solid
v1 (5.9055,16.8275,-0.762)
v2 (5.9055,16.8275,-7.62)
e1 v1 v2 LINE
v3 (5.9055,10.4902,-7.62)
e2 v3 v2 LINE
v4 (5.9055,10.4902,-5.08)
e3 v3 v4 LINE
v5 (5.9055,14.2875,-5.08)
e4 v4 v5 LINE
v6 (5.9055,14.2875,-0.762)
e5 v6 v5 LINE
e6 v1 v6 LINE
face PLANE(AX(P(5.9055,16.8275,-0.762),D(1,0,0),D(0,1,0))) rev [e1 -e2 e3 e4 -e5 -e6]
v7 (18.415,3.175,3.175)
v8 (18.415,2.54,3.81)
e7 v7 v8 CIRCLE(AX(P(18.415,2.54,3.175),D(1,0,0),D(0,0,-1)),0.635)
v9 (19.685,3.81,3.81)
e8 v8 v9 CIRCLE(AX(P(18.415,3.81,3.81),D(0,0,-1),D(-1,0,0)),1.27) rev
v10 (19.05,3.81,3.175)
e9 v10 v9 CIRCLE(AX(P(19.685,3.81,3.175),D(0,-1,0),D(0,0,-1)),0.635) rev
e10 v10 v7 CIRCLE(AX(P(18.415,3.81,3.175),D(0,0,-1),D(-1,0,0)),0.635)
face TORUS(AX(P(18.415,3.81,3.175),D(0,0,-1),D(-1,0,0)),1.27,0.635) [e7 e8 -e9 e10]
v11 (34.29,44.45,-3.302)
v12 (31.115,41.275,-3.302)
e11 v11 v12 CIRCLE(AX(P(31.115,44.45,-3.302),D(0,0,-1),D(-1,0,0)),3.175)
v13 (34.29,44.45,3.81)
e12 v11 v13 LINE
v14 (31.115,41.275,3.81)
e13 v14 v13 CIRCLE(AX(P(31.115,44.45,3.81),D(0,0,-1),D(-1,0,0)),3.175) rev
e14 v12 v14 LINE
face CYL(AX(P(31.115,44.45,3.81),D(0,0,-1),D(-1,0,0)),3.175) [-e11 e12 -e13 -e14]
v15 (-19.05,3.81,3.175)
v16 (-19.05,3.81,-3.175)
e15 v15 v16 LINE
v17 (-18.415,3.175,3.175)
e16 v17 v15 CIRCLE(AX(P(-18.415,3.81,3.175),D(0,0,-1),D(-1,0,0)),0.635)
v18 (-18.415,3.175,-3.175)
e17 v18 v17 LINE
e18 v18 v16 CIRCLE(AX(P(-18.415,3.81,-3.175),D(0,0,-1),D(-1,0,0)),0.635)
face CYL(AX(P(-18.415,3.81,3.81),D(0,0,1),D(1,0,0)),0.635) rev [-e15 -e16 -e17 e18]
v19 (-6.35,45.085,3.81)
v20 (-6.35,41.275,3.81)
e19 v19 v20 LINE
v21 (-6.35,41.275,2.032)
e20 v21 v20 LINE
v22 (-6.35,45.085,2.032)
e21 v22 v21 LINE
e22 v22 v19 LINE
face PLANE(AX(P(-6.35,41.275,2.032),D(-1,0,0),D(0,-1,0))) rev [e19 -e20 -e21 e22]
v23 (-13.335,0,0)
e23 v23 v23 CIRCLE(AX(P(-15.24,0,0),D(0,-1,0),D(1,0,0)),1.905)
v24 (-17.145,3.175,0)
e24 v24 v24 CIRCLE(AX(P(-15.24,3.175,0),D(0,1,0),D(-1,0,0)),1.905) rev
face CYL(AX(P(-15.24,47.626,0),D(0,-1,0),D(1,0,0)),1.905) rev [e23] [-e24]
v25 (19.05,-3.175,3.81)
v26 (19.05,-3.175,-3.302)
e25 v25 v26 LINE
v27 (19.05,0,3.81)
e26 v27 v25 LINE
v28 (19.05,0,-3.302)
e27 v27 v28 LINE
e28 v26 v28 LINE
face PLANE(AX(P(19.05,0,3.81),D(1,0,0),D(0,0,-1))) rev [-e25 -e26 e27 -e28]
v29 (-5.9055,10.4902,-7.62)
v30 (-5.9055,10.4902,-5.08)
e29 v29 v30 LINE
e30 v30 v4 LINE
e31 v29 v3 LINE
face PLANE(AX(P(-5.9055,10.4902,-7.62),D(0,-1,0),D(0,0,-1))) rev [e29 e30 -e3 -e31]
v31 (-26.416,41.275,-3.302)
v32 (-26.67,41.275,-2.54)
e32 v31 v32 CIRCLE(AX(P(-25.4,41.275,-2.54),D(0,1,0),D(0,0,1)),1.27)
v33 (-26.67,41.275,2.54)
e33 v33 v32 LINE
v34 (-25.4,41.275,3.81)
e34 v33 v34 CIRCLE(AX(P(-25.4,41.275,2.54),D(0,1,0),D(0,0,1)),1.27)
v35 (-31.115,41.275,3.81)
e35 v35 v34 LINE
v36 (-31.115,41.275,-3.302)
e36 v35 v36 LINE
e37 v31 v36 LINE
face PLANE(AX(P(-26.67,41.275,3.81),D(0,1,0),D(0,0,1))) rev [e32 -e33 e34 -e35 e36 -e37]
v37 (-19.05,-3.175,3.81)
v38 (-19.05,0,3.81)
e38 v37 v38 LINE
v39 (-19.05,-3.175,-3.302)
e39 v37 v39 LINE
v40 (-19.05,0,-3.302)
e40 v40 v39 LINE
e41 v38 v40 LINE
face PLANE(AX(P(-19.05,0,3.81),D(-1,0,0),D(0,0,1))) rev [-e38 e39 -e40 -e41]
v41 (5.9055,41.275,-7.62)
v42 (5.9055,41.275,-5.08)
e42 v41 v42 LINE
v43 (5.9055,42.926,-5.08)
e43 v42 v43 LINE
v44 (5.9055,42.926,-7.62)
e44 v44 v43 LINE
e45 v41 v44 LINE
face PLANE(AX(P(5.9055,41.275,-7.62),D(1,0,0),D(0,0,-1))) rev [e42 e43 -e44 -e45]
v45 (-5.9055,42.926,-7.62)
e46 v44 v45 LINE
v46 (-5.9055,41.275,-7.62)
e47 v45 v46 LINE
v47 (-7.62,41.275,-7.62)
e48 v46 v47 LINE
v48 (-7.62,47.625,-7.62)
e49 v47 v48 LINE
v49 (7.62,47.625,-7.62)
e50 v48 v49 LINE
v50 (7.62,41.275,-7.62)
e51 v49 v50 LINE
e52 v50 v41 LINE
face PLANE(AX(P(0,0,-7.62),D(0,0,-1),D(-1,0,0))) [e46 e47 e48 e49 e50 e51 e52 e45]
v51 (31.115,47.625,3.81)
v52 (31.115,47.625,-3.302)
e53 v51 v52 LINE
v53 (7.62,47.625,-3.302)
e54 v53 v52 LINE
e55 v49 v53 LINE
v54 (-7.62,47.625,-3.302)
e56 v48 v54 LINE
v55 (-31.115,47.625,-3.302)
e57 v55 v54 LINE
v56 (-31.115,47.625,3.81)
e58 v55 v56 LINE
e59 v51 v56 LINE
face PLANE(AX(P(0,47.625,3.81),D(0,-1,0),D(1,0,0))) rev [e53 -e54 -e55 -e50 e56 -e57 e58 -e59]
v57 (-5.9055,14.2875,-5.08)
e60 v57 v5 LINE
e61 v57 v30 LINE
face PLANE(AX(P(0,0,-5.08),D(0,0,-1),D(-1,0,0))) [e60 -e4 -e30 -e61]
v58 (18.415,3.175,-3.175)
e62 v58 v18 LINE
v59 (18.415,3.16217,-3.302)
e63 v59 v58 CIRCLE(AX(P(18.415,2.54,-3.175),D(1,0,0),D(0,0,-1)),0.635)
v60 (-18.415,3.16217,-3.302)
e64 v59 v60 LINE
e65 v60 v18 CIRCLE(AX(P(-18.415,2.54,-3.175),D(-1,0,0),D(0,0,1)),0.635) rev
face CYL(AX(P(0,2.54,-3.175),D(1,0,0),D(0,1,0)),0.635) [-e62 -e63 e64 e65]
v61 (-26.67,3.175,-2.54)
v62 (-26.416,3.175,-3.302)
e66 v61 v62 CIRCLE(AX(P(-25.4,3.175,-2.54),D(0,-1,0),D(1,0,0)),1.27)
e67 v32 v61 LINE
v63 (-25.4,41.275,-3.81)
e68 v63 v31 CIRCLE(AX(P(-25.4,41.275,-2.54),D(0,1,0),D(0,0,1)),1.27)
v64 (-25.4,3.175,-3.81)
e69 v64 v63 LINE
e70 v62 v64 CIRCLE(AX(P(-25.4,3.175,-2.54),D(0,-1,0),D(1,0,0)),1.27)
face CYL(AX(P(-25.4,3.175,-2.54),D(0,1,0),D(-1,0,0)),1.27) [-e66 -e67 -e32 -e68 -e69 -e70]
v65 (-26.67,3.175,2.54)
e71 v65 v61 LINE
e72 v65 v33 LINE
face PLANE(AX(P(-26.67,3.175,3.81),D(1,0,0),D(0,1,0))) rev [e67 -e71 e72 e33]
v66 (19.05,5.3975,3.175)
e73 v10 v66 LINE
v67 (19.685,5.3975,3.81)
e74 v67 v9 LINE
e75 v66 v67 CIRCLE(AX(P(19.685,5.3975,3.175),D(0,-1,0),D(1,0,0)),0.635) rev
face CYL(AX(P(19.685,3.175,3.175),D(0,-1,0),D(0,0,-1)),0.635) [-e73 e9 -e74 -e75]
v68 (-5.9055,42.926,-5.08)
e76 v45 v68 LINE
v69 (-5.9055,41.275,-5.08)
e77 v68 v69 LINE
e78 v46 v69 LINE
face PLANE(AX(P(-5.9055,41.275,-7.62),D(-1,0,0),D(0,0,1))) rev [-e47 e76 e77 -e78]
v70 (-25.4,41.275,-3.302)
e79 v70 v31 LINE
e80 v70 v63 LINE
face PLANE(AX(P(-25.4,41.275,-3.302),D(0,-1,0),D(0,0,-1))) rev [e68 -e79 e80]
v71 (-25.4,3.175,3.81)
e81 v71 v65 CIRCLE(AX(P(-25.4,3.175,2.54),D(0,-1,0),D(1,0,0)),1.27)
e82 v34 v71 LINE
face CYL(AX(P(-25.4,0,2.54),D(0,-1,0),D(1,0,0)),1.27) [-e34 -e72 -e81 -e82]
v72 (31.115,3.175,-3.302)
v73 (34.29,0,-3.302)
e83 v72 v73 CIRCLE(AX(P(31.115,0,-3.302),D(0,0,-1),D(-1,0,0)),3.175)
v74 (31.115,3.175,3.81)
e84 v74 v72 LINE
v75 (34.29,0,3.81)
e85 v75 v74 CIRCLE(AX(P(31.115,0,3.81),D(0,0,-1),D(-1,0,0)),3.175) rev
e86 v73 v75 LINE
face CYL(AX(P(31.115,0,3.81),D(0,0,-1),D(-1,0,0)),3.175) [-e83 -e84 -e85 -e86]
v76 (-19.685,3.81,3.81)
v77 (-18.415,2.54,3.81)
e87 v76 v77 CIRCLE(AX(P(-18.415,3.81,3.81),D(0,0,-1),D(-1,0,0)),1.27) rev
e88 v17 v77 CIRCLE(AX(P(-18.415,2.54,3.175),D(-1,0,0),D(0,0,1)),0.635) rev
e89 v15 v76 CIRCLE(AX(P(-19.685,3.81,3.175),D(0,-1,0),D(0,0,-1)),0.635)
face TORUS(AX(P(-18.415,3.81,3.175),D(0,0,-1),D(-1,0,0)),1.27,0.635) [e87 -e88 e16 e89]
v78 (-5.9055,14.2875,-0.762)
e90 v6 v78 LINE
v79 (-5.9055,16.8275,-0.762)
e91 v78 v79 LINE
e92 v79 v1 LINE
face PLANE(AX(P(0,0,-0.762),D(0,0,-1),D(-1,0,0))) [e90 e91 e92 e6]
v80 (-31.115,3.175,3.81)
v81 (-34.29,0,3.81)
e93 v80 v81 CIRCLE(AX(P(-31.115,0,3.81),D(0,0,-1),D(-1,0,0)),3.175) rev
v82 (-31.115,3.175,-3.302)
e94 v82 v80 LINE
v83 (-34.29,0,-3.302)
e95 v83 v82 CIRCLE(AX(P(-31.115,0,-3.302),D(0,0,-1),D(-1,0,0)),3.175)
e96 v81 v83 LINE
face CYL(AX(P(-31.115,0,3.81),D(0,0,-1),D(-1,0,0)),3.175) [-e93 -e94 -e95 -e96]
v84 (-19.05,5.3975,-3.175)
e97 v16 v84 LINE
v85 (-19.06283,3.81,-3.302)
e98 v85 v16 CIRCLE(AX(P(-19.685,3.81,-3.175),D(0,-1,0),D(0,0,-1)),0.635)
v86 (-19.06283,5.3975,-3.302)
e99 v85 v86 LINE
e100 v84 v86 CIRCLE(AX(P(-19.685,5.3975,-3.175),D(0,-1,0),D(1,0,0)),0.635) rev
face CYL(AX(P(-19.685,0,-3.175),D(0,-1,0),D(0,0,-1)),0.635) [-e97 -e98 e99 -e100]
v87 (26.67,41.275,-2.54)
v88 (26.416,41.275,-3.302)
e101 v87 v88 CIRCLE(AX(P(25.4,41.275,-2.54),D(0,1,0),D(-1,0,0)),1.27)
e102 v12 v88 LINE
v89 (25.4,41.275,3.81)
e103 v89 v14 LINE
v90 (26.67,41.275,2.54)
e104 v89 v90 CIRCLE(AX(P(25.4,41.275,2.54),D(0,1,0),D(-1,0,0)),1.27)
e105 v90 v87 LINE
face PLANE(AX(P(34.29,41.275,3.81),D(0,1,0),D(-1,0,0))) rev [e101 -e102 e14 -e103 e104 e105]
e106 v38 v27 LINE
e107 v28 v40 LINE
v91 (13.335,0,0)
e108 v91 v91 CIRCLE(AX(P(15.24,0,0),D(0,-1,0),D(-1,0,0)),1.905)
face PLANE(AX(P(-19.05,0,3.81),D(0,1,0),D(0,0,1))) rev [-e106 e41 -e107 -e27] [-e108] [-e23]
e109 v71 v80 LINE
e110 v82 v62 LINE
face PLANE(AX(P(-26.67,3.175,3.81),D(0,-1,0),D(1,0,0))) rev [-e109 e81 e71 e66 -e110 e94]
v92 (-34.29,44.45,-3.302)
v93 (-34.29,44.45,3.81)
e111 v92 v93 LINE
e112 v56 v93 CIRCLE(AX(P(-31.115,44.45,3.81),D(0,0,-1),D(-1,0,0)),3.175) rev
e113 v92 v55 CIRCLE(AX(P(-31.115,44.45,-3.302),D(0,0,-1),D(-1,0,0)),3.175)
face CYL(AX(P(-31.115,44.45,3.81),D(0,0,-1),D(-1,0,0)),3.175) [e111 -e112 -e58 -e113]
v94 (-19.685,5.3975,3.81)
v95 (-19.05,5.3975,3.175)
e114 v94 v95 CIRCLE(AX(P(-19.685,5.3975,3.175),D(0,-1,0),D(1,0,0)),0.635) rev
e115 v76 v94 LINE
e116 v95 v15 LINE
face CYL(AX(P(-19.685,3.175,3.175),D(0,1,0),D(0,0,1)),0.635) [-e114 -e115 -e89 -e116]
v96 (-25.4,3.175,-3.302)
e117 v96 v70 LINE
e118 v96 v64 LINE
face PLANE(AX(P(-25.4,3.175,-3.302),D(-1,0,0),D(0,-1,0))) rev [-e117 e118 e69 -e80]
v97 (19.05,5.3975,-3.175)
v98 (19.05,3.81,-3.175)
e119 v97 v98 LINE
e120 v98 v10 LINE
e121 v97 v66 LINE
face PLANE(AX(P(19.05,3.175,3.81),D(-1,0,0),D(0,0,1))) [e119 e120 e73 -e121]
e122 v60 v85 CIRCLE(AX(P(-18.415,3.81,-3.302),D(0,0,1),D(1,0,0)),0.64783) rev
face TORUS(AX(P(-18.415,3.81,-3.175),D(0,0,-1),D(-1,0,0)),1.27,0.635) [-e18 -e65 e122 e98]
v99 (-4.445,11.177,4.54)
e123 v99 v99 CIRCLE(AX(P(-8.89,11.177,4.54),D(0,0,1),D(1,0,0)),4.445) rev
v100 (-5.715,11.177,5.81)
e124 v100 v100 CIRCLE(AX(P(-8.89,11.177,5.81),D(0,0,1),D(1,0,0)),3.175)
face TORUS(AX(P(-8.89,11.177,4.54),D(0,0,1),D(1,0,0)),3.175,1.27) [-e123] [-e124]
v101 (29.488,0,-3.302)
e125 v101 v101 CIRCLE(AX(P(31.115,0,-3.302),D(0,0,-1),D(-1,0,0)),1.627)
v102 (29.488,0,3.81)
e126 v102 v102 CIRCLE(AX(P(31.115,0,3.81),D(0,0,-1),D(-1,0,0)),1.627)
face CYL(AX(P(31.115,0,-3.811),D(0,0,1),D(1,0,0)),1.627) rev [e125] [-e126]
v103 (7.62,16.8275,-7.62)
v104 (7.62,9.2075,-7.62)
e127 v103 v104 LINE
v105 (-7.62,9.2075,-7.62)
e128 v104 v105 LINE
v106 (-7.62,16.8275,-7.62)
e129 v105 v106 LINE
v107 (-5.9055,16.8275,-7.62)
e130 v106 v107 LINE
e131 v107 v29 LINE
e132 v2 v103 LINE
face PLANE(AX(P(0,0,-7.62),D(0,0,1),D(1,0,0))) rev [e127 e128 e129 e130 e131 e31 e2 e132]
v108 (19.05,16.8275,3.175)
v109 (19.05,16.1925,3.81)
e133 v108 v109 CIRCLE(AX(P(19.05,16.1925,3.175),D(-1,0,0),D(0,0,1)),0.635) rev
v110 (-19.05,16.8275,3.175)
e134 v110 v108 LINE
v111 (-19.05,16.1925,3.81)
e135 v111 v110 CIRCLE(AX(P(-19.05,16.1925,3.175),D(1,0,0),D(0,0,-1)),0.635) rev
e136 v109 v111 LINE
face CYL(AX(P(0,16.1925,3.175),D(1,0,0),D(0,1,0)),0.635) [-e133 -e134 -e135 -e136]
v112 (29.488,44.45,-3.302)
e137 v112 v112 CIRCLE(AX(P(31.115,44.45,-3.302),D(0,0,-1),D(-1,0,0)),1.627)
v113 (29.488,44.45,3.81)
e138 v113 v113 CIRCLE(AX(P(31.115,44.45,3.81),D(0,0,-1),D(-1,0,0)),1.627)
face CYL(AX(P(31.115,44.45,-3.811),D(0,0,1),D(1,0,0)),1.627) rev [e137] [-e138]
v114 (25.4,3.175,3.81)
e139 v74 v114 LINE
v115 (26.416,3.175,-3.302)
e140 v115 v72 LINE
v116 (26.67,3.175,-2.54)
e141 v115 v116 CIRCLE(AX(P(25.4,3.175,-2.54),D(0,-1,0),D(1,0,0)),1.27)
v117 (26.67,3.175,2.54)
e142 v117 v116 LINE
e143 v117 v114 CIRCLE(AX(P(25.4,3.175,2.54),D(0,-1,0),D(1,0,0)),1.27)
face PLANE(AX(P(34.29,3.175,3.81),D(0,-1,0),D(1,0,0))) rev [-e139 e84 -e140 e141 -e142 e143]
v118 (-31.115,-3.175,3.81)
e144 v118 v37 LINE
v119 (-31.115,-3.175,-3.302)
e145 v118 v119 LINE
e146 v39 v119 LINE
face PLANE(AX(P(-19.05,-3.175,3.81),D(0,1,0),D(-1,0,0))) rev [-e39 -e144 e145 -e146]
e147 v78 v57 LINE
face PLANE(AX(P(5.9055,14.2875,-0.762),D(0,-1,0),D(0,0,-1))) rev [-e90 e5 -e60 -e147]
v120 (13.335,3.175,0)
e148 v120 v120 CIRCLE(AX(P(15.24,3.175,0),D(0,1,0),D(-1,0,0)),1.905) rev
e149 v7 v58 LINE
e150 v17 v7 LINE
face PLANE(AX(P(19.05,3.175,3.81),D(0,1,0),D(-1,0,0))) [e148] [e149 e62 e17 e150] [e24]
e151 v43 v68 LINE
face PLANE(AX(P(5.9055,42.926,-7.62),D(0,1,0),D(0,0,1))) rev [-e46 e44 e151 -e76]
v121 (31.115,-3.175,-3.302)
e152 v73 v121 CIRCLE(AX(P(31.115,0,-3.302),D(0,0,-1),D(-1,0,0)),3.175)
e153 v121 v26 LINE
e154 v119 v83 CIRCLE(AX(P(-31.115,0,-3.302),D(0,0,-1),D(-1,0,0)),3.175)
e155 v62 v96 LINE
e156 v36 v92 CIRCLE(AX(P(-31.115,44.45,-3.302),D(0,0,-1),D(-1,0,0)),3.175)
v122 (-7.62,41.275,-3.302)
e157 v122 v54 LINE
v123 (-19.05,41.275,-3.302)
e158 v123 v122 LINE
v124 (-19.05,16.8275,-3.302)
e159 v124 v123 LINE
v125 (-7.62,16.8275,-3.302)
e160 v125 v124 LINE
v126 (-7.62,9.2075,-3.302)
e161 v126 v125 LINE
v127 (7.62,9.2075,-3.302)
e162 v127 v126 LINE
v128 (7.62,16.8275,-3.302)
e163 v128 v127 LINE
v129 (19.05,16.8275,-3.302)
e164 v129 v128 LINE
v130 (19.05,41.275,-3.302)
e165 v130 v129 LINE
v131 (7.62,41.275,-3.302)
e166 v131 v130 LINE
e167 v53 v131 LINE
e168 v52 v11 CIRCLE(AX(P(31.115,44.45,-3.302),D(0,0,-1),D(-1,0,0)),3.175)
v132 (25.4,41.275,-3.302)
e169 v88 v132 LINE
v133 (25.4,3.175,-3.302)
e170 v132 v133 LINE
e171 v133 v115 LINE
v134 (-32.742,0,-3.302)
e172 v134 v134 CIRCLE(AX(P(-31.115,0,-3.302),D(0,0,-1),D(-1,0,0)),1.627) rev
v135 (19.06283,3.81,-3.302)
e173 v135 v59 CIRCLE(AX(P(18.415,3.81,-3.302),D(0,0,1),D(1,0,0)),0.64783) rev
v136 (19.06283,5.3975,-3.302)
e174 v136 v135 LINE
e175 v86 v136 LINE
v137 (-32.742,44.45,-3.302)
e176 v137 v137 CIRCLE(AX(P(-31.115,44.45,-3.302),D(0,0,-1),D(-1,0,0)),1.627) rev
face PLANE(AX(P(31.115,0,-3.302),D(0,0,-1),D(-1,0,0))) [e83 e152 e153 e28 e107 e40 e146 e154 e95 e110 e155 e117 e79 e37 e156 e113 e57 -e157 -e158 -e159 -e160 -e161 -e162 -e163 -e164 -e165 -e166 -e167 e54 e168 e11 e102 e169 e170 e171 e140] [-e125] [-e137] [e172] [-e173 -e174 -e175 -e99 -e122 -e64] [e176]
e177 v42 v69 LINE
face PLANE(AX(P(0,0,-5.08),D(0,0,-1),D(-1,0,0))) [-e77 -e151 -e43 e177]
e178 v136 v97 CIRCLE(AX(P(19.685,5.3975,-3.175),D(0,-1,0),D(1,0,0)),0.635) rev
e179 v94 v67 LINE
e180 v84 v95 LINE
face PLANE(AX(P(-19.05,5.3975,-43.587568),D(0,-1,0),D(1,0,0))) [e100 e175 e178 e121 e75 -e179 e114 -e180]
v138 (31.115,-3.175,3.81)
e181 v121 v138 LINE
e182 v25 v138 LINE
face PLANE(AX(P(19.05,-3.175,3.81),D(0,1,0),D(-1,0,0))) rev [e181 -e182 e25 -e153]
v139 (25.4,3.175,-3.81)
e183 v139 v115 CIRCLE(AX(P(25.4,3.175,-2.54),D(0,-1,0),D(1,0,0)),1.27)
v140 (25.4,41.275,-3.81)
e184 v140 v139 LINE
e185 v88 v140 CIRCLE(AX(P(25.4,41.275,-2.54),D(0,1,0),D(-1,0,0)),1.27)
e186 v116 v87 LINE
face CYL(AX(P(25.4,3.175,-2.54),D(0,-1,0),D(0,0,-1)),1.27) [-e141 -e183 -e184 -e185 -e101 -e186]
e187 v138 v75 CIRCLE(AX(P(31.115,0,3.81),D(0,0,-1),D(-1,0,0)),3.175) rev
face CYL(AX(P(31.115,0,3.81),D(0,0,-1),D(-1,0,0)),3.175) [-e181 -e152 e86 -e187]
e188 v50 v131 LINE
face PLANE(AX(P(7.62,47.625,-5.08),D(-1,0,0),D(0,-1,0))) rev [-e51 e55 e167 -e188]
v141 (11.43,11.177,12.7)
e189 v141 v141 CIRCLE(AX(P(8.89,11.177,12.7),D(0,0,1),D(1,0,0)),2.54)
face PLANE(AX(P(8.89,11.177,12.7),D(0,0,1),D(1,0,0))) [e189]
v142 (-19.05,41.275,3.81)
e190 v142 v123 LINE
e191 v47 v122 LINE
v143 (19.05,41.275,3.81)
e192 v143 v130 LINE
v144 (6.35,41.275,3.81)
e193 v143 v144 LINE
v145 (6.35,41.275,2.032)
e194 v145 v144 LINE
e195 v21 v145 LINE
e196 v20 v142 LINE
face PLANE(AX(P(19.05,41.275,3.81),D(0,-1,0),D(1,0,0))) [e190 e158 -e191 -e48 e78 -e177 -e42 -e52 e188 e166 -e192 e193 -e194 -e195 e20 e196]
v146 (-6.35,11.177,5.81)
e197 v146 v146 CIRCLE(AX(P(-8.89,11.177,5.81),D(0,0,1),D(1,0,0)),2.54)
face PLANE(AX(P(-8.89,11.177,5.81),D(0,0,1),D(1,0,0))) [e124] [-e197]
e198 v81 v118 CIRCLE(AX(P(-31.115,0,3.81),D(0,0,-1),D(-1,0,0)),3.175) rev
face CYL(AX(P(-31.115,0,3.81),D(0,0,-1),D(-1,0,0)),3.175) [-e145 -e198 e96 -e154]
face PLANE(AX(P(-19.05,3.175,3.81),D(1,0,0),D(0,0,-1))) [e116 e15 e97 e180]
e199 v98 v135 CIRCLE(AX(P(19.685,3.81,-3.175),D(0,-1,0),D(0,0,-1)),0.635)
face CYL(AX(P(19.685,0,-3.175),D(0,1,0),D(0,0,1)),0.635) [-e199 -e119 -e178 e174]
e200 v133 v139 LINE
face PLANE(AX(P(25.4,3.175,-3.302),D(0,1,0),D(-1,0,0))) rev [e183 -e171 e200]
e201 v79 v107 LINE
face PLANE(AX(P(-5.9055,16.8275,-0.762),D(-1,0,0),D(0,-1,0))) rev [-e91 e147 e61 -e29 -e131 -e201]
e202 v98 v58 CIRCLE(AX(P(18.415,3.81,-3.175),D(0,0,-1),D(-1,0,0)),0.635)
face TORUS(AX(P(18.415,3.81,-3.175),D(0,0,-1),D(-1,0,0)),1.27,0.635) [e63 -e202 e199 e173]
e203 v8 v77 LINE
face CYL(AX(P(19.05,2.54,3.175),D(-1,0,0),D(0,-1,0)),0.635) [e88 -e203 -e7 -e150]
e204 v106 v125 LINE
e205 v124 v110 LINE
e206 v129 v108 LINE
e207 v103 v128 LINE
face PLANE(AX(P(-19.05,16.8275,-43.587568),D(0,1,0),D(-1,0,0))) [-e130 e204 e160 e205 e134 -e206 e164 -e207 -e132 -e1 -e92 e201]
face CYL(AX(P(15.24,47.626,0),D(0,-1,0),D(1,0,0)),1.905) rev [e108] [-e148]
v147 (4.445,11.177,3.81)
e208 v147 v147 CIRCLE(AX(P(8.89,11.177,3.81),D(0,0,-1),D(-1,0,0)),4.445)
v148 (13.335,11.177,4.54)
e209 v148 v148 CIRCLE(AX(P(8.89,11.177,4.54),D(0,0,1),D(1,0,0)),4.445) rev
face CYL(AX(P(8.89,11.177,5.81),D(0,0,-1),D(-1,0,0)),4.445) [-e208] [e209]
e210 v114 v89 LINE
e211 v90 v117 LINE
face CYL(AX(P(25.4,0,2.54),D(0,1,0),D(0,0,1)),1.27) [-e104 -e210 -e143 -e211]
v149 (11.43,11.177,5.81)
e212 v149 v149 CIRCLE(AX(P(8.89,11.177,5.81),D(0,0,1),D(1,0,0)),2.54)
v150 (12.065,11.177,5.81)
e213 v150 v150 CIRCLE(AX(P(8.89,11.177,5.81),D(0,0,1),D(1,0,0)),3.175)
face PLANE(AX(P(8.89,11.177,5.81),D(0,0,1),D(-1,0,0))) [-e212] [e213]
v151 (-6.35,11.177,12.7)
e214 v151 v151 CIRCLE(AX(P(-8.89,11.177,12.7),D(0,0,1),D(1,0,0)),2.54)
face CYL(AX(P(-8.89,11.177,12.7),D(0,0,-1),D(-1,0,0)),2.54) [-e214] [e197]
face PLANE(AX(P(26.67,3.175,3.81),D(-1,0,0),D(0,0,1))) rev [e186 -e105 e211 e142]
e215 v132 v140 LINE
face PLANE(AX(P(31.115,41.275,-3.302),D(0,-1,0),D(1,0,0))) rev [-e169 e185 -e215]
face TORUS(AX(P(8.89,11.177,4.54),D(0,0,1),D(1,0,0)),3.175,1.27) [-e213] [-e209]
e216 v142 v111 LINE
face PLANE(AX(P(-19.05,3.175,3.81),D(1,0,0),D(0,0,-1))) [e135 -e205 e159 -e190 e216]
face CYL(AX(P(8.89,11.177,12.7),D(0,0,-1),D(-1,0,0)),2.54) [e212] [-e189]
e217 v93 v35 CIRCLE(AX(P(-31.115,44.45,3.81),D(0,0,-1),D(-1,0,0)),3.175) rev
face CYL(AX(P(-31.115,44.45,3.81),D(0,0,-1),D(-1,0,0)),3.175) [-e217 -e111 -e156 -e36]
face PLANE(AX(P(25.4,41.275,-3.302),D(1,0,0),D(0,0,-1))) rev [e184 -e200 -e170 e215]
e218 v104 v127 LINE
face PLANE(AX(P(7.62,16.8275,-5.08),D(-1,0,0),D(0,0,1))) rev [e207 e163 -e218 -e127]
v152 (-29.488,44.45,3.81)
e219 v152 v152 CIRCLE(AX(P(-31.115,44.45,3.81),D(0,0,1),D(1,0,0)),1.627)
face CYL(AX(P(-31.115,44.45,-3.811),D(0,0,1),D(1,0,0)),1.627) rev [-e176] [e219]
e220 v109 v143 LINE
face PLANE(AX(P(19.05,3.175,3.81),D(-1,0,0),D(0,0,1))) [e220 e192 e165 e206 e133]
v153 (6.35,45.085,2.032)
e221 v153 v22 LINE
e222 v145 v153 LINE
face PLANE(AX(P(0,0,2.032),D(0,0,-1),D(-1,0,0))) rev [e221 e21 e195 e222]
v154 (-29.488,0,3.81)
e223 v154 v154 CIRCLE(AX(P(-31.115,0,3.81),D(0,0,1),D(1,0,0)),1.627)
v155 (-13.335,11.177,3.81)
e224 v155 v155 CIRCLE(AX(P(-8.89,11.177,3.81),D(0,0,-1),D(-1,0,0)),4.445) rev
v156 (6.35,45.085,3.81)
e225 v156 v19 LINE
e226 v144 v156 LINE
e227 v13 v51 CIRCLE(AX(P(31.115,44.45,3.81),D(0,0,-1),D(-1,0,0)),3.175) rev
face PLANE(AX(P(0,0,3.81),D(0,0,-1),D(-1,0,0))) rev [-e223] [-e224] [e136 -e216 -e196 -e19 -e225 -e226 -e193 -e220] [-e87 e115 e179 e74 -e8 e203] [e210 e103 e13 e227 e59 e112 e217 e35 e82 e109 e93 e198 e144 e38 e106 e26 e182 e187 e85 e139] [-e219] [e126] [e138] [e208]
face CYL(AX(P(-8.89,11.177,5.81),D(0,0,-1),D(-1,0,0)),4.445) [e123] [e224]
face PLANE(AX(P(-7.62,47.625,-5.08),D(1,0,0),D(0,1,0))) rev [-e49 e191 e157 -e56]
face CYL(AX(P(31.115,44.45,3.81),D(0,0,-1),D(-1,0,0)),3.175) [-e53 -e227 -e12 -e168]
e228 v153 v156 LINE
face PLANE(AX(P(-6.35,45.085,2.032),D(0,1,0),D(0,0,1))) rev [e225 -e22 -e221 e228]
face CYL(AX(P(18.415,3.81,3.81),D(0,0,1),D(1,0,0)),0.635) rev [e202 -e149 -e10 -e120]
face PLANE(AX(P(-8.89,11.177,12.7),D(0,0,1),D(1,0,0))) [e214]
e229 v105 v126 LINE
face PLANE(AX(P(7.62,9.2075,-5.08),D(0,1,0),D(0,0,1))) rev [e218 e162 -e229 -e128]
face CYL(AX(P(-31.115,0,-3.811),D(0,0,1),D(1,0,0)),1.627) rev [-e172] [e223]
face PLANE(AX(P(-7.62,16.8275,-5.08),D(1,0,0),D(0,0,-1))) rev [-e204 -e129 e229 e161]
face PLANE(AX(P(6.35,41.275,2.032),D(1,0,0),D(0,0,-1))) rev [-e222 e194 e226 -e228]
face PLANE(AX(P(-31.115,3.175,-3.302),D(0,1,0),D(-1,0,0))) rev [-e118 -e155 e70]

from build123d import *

# Parameters (mm, degrees)
BOSS_EXTRUDE2_DEPTH  = 3.81
FILLET1_R            = 3.175
CUT_EXTRUDE1_REACH   = 61.178
SKETCH4_R            = 1.627
FILLET2_R            = 1.27
CUT_EXTRUDE2_REACH   = 60.809
SKETCH5_R            = 1.905
SKETCH6_W            = 38.1
SKETCH6_H            = 11.43
BOSS_EXTRUDE3_DEPTH  = 7.62
SKETCH7_R            = 2.54
BOSS_EXTRUDE4_DEPTH  = 8.89
SKETCH8_R            = 4.445
BOSS_EXTRUDE5_DEPTH  = 2
FILLET3_R            = 1.27
FILLET3_OF_MIRROR3_R = 1.27
FILLET4_R            = 0.635
CUT_EXTRUDE3_START   = -0.508
CUT_EXTRUDE3_DEPTH   = 0.508
SKETCH13_W           = 12.7
SKETCH13_H           = 3.81
CUT_EXTRUDE4_DEPTH   = 1.778
SKETCH14_W           = 11.811
SKETCH14_H           = 2.54
CUT_EXTRUDE5_DEPTH   = 2.54
SKETCH15_W           = 15.24
SKETCH15_H           = 6.35
BOSS_EXTRUDE6_DEPTH  = 1.778
BOSS_EXTRUDE7_DEPTH  = 2.54
BOSS_EXTRUDE8_DEPTH  = 2.54


# Read off the part's stored shape, not the designer's step: Cut-Extrude3
with BuildPart() as part:
    # Sketch3 → Boss-Extrude2 (new, symmetric)
    with BuildSketch(Plane.XY):
        Polygon((34.29, -3.175), (34.29, 3.175), (26.67, 3.175), (26.67, 41.275), (34.29, 41.275), (34.29, 47.625), (0, 47.625), (-34.29, 47.625), (-34.29, 41.275), (-26.67, 41.275), (-26.67, 3.175), (-34.29, 3.175), (-34.29, -3.175), (-19.05, -3.175), (-19.05, 0), (19.05, 0), (19.05, -3.175), align=None)
        Polygon((-19.05, 3.175), (-19.05, 41.275), (0, 41.275), (19.05, 41.275), (19.05, 3.175), align=None, mode=Mode.SUBTRACT)
    extrude(amount=BOSS_EXTRUDE2_DEPTH, both=True)

    # Fillet1
    fillet1_edges = [part.edges().sort_by_distance(p)[0] for p in [
        (34.29, 3.175, 0),
        (34.29, 41.275, 0),
        (34.29, 47.625, 0),
        (-34.29, 3.175, 0),
        (-34.29, 41.275, 0),
        (-34.29, 47.625, 0),
        (34.29, -3.175, 0),
        (-34.29, -3.175, 0),
    ]]
    fillet(fillet1_edges, radius=FILLET1_R - 0.0001)  # a hair under: the kernel refuses the full size

    # Sketch4 → Cut-Extrude1 (cut, up to next)
    with BuildSketch(Plane.XY.offset(3.81), mode=Mode.PRIVATE) as cut_extrude1_sk1:
        with Locations((-31.115, 44.45)):
            Circle(SKETCH4_R)
    cut_extrude1_tool1 = extrude(cut_extrude1_sk1.sketch, amount=-CUT_EXTRUDE1_REACH, mode=Mode.PRIVATE) & part.part
    # Sketch4 → Cut-Extrude1 (cut, up to next)
    with BuildSketch(Plane.XY.offset(3.81), mode=Mode.PRIVATE) as cut_extrude1_sk2:
        with Locations((-31.115, 0)):
            Circle(SKETCH4_R)
    cut_extrude1_tool2 = extrude(cut_extrude1_sk2.sketch, amount=-CUT_EXTRUDE1_REACH, mode=Mode.PRIVATE) & part.part
    cut_extrude1_1 = cut_extrude1_tool1.solids().sort_by_distance((-31.115, 44.45, 3.81))[0]
    add(cut_extrude1_1, mode=Mode.SUBTRACT)
    cut_extrude1_2 = cut_extrude1_tool2.solids().sort_by_distance((-31.115, 0, 3.81))[0]
    add(cut_extrude1_2, mode=Mode.SUBTRACT)
    cut_extrude1 = cut_extrude1_1 + cut_extrude1_2  # Cut-Extrude1 as one shape, for the pattern or mirror that repeats it

    # Mirror1: Cut-Extrude1 across plane
    add(cut_extrude1.mirror(Plane(origin=(0, 0, 0), x_dir=(0, 0, 1), z_dir=(1, 0, 0))), mode=Mode.SUBTRACT)

    # Fillet2
    fillet2_edges = [part.edges().sort_by_distance(p)[0] for p in [
        (-26.67, 22.225, -3.81),
        (26.67, 22.225, -3.81),
        (26.67, 22.225, 3.81),
        (-26.67, 22.225, 3.81),
    ]]
    fillet(fillet2_edges, radius=FILLET2_R)

    # Sketch5 → Cut-Extrude2 (cut, up to next)
    with BuildSketch(Plane.XZ, mode=Mode.PRIVATE) as cut_extrude2_sk1:
        with Locations((-15.24, 0)):
            Circle(SKETCH5_R)
    cut_extrude2_tool1 = extrude(cut_extrude2_sk1.sketch, amount=-CUT_EXTRUDE2_REACH, mode=Mode.PRIVATE) & part.part
    # Sketch5 → Cut-Extrude2 (cut, up to next)
    with BuildSketch(Plane.XZ, mode=Mode.PRIVATE) as cut_extrude2_sk2:
        with Locations(Location((15.24, 0, 0), (0, 0, 180))):
            Circle(SKETCH5_R)
    cut_extrude2_tool2 = extrude(cut_extrude2_sk2.sketch, amount=-CUT_EXTRUDE2_REACH, mode=Mode.PRIVATE) & part.part
    add(cut_extrude2_tool1.solids().sort_by_distance((-15.24, 0, 0))[0], mode=Mode.SUBTRACT)
    add(cut_extrude2_tool2.solids().sort_by_distance((15.24, 0, 0))[0], mode=Mode.SUBTRACT)

    # Sketch6 → Boss-Extrude3 (add)
    with BuildSketch(Plane.XY.offset(3.81)):
        with Locations((0, 11.1125)):
            Rectangle(SKETCH6_W, SKETCH6_H)
    extrude(amount=-BOSS_EXTRUDE3_DEPTH)

    # Sketch7 → Boss-Extrude4 (add)
    with BuildSketch(Plane.XY.offset(3.81)):
        with Locations(Location((-8.89, 11.176999998, 0), (0, 0, 180))):
            Circle(SKETCH7_R)
        with Locations(Location((8.89, 11.176999998, 0), (0, 0, 180))):
            Circle(SKETCH7_R)
    extrude(amount=BOSS_EXTRUDE4_DEPTH)

    # Sketch8 → Boss-Extrude5 (add)
    with BuildSketch(Plane.XY.offset(3.81)):
        with Locations(Location((-8.89, 11.176999998, 0), (0, 0, 180))):
            Circle(SKETCH8_R)
    boss_extrude5 = extrude(amount=BOSS_EXTRUDE5_DEPTH)

    # Fillet3
    fillet3_edges = [part.edges().sort_by_distance(p)[0] for p in [
        (-4.445, 11.176999998, 5.81),
    ]]
    fillet(fillet3_edges, radius=FILLET3_R)

    # Mirror3: Boss-Extrude5 across plane
    add(boss_extrude5.mirror(Plane(origin=(0, 0, 0), x_dir=(0, 0, 1), z_dir=(1, 0, 0))))

    # Fillet3 of Mirror3
    fillet3_of_mirror3_edges = [part.edges().sort_by_distance(p)[0] for p in [
        (4.445, 11.176999998, 5.81),
    ]]
    fillet(fillet3_of_mirror3_edges, radius=FILLET3_OF_MIRROR3_R)

    # Fillet4
    fillet4_edges = [part.edges().sort_by_distance(p)[0] for p in [
        (19.05, 4.28625, 3.81),
        (19.05, 4.28625, -3.81),
        (-19.05, 4.28625, 3.81),
        (-19.05, 4.28625, -3.81),
        (0, 16.8275, 3.81),
        (19.05, 3.175, 0),
        (-19.05, 3.175, 0),
        (0, 3.175, -3.81),
        (0, 3.175, 3.81),
    ]]
    fillet(fillet4_edges, radius=FILLET4_R)

    # Cut-Extrude3 outline → Cut-Extrude3 (cut)
    with BuildSketch(Plane(origin=(0, 0, -3.81), x_dir=(-1, 0, 0), z_dir=(0, 0, -1)).offset(CUT_EXTRUDE3_START)):
        Polygon((-36, 41.275), (-25.4, 41.275), (-25.4, 3.175), (-36, 3.175), (-36, -5), (36, -5), (36, 3.175), (25.4, 3.175), (25.4, 41.275), (36, 41.275), (36, 49), (-36, 49), align=None)
    extrude(amount=CUT_EXTRUDE3_DEPTH, mode=Mode.SUBTRACT)

    # Sketch13 → Cut-Extrude4 (cut)
    with BuildSketch(Plane.XY.offset(3.81)):
        with Locations((0, 43.18)):
            Rectangle(SKETCH13_W, SKETCH13_H)
    extrude(amount=-CUT_EXTRUDE4_DEPTH, mode=Mode.SUBTRACT)

    # Sketch14 → Cut-Extrude5 (cut)
    with BuildSketch(Plane(origin=(0, 0, -3.302), x_dir=(-1, 0, 0), z_dir=(0, 0, -1))):
        with Locations((0, 15.5575)):
            Rectangle(SKETCH14_W, SKETCH14_H)
    extrude(amount=-CUT_EXTRUDE5_DEPTH, mode=Mode.SUBTRACT)

    # Sketch15 → Boss-Extrude6 (add)
    with BuildSketch(Plane(origin=(0, 0, -3.302), x_dir=(-1, 0, 0), z_dir=(0, 0, -1))):
        with Locations((0, 44.45)):
            Rectangle(SKETCH15_W, SKETCH15_H)
        Polygon((-7.62, 16.8275), (-5.9055, 16.8275), (-5.9055, 14.2875), (5.9055, 14.2875), (5.9055, 16.8275), (7.62, 16.8275), (7.62, 9.2075), (-7.62, 9.2075), align=None)
    extrude(amount=BOSS_EXTRUDE6_DEPTH)

    # Sketch16 → Boss-Extrude7 (add)
    with BuildSketch(Plane(origin=(0, 0, -5.08), x_dir=(-1, 0, 0), z_dir=(0, 0, -1))):
        Polygon((-5.9055, 41.275), (-5.9055, 42.926), (5.9055, 42.926), (5.9055, 41.275), (7.62, 41.275), (7.62, 47.625), (-7.62, 47.625), (-7.62, 41.275), align=None)
    extrude(amount=BOSS_EXTRUDE7_DEPTH)

    # Sketch18 → Boss-Extrude8 (add)
    with BuildSketch(Plane(origin=(0, 0, -5.08), x_dir=(-1, 0, 0), z_dir=(0, 0, -1))):
        Polygon((-7.62, 16.8275), (-5.9055, 16.8275), (-5.9055, 10.4902), (5.9055, 10.4902), (5.9055, 16.8275), (7.62, 16.8275), (7.62, 9.2075), (-7.62, 9.2075), align=None)
    extrude(amount=BOSS_EXTRUDE8_DEPTH)


solid = part.part
